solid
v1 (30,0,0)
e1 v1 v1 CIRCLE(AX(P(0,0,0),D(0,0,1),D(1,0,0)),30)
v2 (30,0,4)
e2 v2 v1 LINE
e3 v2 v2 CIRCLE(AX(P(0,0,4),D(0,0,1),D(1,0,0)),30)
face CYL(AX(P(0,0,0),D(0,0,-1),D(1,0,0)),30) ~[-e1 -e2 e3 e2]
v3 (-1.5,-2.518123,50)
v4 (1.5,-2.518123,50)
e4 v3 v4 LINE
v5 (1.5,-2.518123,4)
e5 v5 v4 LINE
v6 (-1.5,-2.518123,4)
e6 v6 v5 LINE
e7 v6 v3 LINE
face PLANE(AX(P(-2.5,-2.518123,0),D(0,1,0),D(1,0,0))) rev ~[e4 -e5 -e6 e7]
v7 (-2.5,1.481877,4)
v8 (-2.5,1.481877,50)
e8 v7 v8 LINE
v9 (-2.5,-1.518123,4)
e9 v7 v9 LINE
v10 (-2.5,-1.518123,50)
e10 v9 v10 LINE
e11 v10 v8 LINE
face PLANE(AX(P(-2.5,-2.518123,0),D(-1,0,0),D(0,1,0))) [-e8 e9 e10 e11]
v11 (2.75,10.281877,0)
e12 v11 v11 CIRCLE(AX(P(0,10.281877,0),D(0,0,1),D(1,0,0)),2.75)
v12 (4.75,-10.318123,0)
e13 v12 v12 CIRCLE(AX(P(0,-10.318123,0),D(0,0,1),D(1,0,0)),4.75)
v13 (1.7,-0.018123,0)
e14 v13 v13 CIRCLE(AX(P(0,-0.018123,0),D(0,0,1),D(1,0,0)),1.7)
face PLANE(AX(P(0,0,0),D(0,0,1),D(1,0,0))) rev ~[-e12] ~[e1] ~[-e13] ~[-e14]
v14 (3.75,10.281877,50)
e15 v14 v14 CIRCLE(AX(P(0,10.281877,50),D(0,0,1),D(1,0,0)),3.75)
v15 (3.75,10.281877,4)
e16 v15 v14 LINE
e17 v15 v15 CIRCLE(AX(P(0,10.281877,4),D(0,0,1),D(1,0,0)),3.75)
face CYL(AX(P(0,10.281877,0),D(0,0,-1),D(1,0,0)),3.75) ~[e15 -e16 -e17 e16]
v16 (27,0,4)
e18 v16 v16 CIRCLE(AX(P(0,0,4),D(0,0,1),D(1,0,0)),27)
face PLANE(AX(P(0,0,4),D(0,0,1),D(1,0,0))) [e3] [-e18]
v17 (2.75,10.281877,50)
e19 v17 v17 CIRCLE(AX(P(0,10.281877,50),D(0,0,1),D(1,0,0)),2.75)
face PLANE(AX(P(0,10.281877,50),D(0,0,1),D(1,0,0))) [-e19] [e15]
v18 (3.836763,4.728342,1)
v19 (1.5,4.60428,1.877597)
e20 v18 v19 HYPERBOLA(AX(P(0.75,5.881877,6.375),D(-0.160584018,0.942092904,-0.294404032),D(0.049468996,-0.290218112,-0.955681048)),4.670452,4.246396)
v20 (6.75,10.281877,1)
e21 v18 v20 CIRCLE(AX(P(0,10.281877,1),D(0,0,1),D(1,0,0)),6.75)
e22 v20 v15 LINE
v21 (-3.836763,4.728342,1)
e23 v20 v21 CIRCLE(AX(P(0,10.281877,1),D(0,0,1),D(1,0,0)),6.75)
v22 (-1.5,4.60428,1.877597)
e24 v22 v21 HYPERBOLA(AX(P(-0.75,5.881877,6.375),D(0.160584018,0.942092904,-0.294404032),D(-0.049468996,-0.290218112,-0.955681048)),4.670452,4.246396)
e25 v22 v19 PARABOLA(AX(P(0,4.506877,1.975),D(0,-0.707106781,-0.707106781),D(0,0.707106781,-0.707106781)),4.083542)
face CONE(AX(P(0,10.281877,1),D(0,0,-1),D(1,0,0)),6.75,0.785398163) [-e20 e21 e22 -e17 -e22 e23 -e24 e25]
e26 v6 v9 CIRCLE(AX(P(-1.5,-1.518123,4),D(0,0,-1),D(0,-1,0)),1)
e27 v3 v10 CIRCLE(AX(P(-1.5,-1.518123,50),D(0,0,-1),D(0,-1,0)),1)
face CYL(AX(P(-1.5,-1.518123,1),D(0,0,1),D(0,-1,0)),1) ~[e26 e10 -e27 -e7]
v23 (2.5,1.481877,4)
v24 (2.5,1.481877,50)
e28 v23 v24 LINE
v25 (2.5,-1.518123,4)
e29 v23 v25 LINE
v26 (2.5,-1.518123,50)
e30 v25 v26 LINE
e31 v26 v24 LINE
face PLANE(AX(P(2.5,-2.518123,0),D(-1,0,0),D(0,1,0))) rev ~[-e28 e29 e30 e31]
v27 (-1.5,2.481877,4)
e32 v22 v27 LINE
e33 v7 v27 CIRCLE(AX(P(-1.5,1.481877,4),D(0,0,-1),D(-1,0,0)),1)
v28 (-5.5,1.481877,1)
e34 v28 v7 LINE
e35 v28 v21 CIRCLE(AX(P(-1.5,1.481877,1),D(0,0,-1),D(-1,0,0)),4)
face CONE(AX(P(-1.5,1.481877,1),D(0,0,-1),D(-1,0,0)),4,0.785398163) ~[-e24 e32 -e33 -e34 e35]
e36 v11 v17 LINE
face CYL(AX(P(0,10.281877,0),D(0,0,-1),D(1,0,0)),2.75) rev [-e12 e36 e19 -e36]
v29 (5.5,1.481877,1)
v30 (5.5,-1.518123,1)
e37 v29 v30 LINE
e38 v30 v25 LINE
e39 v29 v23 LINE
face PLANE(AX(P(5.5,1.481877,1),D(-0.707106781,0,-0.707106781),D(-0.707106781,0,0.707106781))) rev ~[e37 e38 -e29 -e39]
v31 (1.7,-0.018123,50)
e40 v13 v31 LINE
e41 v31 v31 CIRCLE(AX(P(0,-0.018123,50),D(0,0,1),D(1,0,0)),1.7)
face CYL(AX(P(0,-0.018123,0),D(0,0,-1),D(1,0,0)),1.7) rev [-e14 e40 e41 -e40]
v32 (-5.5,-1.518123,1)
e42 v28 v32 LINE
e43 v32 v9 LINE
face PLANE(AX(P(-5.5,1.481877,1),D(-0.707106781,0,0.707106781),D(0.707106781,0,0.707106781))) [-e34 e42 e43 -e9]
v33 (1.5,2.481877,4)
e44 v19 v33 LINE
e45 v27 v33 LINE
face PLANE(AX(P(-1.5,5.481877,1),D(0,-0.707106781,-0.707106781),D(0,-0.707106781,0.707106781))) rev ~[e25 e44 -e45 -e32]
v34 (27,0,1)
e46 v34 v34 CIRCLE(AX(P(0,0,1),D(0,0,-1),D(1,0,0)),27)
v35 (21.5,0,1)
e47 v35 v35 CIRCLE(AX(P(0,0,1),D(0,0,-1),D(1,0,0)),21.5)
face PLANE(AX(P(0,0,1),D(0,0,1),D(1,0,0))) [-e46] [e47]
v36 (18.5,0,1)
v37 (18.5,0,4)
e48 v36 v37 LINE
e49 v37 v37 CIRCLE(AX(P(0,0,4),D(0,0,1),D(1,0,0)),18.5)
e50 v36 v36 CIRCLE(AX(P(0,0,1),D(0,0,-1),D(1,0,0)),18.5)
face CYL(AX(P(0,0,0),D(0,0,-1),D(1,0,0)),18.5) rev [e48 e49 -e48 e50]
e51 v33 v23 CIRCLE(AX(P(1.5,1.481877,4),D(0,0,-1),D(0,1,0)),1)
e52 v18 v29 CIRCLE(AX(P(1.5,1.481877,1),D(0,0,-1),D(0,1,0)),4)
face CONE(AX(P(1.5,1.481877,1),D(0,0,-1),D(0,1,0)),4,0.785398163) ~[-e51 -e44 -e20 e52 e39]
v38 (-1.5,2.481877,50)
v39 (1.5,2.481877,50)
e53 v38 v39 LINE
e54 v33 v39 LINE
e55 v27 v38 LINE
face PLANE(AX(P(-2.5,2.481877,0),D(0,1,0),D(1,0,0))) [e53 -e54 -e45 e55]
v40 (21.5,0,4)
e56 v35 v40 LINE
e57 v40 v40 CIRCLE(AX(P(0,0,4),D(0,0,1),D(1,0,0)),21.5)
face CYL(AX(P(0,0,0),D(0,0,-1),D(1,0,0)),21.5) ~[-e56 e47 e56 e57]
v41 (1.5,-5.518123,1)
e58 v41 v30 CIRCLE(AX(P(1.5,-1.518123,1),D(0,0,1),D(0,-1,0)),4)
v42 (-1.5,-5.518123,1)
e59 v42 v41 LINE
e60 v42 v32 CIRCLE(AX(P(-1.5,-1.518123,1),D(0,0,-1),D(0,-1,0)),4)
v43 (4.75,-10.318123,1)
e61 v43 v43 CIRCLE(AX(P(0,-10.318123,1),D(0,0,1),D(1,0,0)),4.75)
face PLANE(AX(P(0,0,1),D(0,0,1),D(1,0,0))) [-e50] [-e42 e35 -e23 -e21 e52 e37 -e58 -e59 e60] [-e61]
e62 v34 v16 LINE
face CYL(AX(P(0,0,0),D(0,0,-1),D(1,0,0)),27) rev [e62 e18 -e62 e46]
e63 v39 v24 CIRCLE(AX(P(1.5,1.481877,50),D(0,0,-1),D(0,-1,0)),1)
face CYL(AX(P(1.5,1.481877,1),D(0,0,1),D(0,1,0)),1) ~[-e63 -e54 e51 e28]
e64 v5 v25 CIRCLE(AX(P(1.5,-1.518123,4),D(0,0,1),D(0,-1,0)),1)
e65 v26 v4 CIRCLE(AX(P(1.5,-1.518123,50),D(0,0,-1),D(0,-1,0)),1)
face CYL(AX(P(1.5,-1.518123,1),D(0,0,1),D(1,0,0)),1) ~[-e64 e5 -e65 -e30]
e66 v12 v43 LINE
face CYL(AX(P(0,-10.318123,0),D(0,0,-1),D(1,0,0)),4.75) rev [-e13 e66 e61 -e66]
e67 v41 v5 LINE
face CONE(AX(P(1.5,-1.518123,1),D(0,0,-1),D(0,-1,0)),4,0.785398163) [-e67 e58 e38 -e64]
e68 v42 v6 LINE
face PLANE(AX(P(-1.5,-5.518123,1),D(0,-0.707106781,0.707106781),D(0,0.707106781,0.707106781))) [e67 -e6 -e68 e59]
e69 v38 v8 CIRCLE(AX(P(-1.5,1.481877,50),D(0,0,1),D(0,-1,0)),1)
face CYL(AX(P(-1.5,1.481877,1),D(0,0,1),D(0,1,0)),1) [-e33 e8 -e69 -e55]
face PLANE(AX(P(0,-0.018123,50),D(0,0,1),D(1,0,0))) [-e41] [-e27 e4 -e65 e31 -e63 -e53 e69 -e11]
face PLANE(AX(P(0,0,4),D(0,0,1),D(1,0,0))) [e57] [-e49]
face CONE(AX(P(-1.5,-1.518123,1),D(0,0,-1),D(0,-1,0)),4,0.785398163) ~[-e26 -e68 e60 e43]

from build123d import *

# Parameters (mm, degrees)
F0_R         = 30
F0_R_2       = 27
F0_R_3       = 21.5
F0_R_4       = 18.5
F0_R_5       = 4.75
F0_W         = 5
F0_H         = 5
F0_R_6       = 3.75
F0_R_7       = 1.7
F1_DEPTH     = 1
F2_DEPTH     = 4
F0_R_8       = 2.75
F3_DEPTH     = 50
F4_R         = 1
F5_T1_DEPTH  = 3
F5_T3_DEPTH  = 3
F5_T6_ANGLE  = 90
F5_T10_ANGLE = 90
F5_T12_ANGLE = 90
F5_T14_ANGLE = 90


# Not quite as in the source:
# - a fillet or chamfer that OpenCascade refuses, or shapes differently, is made with other operations: its cross-section is extruded or revolved along the edge and cut away or added


with BuildPart() as f1:
    # F0 (on Top) → F1 (new body)
    with BuildSketch(Plane.XY):
        Circle(F0_R)
        Circle(F0_R_2, mode=Mode.SUBTRACT)
        Circle(F0_R_2)
        Circle(F0_R_3, mode=Mode.SUBTRACT)
        Circle(F0_R_3)
        Circle(F0_R_4, mode=Mode.SUBTRACT)
        Circle(F0_R_4)
        with Locations((0, -10.3181230716)):
            Circle(F0_R_5, mode=Mode.SUBTRACT)
        with Locations((0, -0.0181230716)):
            Rectangle(F0_W, F0_H, mode=Mode.SUBTRACT)
        with Locations((0, 10.2818769284)):
            Circle(F0_R_6, mode=Mode.SUBTRACT)
        with Locations((0, -0.0181230716)):
            Rectangle(F0_W, F0_H)
        with Locations((0, -0.0181230716)):
            Circle(F0_R_7, mode=Mode.SUBTRACT)
    extrude(amount=F1_DEPTH)

    # F0 (on Top) → F2 (join)
    with BuildSketch(Plane.XY):
        Circle(F0_R)
        Circle(F0_R_2, mode=Mode.SUBTRACT)
        Circle(F0_R_3)
        Circle(F0_R_4, mode=Mode.SUBTRACT)
    extrude(amount=F2_DEPTH)

    # F0 (on Top) → F3 (join)
    with BuildSketch(Plane.XY):
        with Locations((0, -0.0181230716)):
            Rectangle(F0_W, F0_H)
        with Locations((0, -0.0181230716)):
            Circle(F0_R_7, mode=Mode.SUBTRACT)
        with Locations((0, 10.2818769284)):
            Circle(F0_R_6)
        with Locations((0, 10.2818769284)):
            Circle(F0_R_8, mode=Mode.SUBTRACT)
    extrude(amount=F3_DEPTH)

    # F4
    f4_edges = [f1.edges().sort_by_distance(p)[0] for p in [
        (-2.5, -2.518123, 25.5),
        (2.5, -2.518123, 25.5),
        (-2.5, 2.481877, 25.5),
        (2.5, 2.481877, 25.5),
    ]]
    fillet(f4_edges, radius=F4_R)

    # F5: chamfer of 3 on 3 edges, made by hand

    # F5_s2 → F5_t1 (join)
    with BuildSketch(Plane.YZ.offset(-1.5)):
        Polygon((-5.5181230716, 1), (-2.5181230716, 4), (-2.5181230716, 1), align=None)
        Polygon((5.4818769284, 1), (2.4818769284, 4), (2.4818769284, 1), align=None)
    extrude(amount=F5_T1_DEPTH)

    # F5_s4 → F5_t3 (join)
    with BuildSketch(Plane.XZ.offset(-1.4818769284)):
        Polygon((-5.5, 1), (-2.5, 4), (-2.5, 1), align=None)
        Polygon((5.5, 1), (2.5, 4), (2.5, 1), align=None)
    extrude(amount=F5_T3_DEPTH)

    # F5_s5 → F5_t6 (revolve)
    with BuildSketch(Plane.YZ.offset(-1.5)):
        Polygon((-5.5181230716, 1), (-2.5181230716, 4), (-2.5181230716, 1), align=None)
    revolve(axis=Axis((-1.5, -1.5181230716, 1), (0, 0, -1)), revolution_arc=F5_T6_ANGLE)

    # F5_s7 → F5_t8 (revolve)
    with BuildSketch(Plane.XZ.offset(-10.2818769284)):
        Polygon((6.75, 1), (3.75, 4), (3.75, 1), align=None)
    revolve(axis=Axis((0, 10.2818769284, 1), (0, 0, 1)))

    # F5_s9 → F5_t10 (revolve)
    with BuildSketch(Plane.XZ.offset(-1.4818769284)):
        Polygon((-5.5, 1), (-2.5, 4), (-2.5, 1), align=None)
    revolve(axis=Axis((-1.5, 1.4818769284, 1), (0, 0, -1)), revolution_arc=F5_T10_ANGLE)

    # F5_s11 → F5_t12 (revolve)
    with BuildSketch(Plane.YZ.offset(1.5)):
        Polygon((5.4818769284, 1), (2.4818769284, 4), (2.4818769284, 1), align=None)
    revolve(axis=Axis((1.5, 1.4818769284, 1), (0, 0, -1)), revolution_arc=F5_T12_ANGLE)

    # F5_s13 → F5_t14 (revolve)
    with BuildSketch(Plane.YZ.offset(1.5)):
        Polygon((-5.5181230716, 1), (-2.5181230716, 4), (-2.5181230716, 1), align=None)
    revolve(axis=Axis((1.5, -1.5181230716, 1), (0, 0, 1)), revolution_arc=F5_T14_ANGLE)


solid = f1.part
